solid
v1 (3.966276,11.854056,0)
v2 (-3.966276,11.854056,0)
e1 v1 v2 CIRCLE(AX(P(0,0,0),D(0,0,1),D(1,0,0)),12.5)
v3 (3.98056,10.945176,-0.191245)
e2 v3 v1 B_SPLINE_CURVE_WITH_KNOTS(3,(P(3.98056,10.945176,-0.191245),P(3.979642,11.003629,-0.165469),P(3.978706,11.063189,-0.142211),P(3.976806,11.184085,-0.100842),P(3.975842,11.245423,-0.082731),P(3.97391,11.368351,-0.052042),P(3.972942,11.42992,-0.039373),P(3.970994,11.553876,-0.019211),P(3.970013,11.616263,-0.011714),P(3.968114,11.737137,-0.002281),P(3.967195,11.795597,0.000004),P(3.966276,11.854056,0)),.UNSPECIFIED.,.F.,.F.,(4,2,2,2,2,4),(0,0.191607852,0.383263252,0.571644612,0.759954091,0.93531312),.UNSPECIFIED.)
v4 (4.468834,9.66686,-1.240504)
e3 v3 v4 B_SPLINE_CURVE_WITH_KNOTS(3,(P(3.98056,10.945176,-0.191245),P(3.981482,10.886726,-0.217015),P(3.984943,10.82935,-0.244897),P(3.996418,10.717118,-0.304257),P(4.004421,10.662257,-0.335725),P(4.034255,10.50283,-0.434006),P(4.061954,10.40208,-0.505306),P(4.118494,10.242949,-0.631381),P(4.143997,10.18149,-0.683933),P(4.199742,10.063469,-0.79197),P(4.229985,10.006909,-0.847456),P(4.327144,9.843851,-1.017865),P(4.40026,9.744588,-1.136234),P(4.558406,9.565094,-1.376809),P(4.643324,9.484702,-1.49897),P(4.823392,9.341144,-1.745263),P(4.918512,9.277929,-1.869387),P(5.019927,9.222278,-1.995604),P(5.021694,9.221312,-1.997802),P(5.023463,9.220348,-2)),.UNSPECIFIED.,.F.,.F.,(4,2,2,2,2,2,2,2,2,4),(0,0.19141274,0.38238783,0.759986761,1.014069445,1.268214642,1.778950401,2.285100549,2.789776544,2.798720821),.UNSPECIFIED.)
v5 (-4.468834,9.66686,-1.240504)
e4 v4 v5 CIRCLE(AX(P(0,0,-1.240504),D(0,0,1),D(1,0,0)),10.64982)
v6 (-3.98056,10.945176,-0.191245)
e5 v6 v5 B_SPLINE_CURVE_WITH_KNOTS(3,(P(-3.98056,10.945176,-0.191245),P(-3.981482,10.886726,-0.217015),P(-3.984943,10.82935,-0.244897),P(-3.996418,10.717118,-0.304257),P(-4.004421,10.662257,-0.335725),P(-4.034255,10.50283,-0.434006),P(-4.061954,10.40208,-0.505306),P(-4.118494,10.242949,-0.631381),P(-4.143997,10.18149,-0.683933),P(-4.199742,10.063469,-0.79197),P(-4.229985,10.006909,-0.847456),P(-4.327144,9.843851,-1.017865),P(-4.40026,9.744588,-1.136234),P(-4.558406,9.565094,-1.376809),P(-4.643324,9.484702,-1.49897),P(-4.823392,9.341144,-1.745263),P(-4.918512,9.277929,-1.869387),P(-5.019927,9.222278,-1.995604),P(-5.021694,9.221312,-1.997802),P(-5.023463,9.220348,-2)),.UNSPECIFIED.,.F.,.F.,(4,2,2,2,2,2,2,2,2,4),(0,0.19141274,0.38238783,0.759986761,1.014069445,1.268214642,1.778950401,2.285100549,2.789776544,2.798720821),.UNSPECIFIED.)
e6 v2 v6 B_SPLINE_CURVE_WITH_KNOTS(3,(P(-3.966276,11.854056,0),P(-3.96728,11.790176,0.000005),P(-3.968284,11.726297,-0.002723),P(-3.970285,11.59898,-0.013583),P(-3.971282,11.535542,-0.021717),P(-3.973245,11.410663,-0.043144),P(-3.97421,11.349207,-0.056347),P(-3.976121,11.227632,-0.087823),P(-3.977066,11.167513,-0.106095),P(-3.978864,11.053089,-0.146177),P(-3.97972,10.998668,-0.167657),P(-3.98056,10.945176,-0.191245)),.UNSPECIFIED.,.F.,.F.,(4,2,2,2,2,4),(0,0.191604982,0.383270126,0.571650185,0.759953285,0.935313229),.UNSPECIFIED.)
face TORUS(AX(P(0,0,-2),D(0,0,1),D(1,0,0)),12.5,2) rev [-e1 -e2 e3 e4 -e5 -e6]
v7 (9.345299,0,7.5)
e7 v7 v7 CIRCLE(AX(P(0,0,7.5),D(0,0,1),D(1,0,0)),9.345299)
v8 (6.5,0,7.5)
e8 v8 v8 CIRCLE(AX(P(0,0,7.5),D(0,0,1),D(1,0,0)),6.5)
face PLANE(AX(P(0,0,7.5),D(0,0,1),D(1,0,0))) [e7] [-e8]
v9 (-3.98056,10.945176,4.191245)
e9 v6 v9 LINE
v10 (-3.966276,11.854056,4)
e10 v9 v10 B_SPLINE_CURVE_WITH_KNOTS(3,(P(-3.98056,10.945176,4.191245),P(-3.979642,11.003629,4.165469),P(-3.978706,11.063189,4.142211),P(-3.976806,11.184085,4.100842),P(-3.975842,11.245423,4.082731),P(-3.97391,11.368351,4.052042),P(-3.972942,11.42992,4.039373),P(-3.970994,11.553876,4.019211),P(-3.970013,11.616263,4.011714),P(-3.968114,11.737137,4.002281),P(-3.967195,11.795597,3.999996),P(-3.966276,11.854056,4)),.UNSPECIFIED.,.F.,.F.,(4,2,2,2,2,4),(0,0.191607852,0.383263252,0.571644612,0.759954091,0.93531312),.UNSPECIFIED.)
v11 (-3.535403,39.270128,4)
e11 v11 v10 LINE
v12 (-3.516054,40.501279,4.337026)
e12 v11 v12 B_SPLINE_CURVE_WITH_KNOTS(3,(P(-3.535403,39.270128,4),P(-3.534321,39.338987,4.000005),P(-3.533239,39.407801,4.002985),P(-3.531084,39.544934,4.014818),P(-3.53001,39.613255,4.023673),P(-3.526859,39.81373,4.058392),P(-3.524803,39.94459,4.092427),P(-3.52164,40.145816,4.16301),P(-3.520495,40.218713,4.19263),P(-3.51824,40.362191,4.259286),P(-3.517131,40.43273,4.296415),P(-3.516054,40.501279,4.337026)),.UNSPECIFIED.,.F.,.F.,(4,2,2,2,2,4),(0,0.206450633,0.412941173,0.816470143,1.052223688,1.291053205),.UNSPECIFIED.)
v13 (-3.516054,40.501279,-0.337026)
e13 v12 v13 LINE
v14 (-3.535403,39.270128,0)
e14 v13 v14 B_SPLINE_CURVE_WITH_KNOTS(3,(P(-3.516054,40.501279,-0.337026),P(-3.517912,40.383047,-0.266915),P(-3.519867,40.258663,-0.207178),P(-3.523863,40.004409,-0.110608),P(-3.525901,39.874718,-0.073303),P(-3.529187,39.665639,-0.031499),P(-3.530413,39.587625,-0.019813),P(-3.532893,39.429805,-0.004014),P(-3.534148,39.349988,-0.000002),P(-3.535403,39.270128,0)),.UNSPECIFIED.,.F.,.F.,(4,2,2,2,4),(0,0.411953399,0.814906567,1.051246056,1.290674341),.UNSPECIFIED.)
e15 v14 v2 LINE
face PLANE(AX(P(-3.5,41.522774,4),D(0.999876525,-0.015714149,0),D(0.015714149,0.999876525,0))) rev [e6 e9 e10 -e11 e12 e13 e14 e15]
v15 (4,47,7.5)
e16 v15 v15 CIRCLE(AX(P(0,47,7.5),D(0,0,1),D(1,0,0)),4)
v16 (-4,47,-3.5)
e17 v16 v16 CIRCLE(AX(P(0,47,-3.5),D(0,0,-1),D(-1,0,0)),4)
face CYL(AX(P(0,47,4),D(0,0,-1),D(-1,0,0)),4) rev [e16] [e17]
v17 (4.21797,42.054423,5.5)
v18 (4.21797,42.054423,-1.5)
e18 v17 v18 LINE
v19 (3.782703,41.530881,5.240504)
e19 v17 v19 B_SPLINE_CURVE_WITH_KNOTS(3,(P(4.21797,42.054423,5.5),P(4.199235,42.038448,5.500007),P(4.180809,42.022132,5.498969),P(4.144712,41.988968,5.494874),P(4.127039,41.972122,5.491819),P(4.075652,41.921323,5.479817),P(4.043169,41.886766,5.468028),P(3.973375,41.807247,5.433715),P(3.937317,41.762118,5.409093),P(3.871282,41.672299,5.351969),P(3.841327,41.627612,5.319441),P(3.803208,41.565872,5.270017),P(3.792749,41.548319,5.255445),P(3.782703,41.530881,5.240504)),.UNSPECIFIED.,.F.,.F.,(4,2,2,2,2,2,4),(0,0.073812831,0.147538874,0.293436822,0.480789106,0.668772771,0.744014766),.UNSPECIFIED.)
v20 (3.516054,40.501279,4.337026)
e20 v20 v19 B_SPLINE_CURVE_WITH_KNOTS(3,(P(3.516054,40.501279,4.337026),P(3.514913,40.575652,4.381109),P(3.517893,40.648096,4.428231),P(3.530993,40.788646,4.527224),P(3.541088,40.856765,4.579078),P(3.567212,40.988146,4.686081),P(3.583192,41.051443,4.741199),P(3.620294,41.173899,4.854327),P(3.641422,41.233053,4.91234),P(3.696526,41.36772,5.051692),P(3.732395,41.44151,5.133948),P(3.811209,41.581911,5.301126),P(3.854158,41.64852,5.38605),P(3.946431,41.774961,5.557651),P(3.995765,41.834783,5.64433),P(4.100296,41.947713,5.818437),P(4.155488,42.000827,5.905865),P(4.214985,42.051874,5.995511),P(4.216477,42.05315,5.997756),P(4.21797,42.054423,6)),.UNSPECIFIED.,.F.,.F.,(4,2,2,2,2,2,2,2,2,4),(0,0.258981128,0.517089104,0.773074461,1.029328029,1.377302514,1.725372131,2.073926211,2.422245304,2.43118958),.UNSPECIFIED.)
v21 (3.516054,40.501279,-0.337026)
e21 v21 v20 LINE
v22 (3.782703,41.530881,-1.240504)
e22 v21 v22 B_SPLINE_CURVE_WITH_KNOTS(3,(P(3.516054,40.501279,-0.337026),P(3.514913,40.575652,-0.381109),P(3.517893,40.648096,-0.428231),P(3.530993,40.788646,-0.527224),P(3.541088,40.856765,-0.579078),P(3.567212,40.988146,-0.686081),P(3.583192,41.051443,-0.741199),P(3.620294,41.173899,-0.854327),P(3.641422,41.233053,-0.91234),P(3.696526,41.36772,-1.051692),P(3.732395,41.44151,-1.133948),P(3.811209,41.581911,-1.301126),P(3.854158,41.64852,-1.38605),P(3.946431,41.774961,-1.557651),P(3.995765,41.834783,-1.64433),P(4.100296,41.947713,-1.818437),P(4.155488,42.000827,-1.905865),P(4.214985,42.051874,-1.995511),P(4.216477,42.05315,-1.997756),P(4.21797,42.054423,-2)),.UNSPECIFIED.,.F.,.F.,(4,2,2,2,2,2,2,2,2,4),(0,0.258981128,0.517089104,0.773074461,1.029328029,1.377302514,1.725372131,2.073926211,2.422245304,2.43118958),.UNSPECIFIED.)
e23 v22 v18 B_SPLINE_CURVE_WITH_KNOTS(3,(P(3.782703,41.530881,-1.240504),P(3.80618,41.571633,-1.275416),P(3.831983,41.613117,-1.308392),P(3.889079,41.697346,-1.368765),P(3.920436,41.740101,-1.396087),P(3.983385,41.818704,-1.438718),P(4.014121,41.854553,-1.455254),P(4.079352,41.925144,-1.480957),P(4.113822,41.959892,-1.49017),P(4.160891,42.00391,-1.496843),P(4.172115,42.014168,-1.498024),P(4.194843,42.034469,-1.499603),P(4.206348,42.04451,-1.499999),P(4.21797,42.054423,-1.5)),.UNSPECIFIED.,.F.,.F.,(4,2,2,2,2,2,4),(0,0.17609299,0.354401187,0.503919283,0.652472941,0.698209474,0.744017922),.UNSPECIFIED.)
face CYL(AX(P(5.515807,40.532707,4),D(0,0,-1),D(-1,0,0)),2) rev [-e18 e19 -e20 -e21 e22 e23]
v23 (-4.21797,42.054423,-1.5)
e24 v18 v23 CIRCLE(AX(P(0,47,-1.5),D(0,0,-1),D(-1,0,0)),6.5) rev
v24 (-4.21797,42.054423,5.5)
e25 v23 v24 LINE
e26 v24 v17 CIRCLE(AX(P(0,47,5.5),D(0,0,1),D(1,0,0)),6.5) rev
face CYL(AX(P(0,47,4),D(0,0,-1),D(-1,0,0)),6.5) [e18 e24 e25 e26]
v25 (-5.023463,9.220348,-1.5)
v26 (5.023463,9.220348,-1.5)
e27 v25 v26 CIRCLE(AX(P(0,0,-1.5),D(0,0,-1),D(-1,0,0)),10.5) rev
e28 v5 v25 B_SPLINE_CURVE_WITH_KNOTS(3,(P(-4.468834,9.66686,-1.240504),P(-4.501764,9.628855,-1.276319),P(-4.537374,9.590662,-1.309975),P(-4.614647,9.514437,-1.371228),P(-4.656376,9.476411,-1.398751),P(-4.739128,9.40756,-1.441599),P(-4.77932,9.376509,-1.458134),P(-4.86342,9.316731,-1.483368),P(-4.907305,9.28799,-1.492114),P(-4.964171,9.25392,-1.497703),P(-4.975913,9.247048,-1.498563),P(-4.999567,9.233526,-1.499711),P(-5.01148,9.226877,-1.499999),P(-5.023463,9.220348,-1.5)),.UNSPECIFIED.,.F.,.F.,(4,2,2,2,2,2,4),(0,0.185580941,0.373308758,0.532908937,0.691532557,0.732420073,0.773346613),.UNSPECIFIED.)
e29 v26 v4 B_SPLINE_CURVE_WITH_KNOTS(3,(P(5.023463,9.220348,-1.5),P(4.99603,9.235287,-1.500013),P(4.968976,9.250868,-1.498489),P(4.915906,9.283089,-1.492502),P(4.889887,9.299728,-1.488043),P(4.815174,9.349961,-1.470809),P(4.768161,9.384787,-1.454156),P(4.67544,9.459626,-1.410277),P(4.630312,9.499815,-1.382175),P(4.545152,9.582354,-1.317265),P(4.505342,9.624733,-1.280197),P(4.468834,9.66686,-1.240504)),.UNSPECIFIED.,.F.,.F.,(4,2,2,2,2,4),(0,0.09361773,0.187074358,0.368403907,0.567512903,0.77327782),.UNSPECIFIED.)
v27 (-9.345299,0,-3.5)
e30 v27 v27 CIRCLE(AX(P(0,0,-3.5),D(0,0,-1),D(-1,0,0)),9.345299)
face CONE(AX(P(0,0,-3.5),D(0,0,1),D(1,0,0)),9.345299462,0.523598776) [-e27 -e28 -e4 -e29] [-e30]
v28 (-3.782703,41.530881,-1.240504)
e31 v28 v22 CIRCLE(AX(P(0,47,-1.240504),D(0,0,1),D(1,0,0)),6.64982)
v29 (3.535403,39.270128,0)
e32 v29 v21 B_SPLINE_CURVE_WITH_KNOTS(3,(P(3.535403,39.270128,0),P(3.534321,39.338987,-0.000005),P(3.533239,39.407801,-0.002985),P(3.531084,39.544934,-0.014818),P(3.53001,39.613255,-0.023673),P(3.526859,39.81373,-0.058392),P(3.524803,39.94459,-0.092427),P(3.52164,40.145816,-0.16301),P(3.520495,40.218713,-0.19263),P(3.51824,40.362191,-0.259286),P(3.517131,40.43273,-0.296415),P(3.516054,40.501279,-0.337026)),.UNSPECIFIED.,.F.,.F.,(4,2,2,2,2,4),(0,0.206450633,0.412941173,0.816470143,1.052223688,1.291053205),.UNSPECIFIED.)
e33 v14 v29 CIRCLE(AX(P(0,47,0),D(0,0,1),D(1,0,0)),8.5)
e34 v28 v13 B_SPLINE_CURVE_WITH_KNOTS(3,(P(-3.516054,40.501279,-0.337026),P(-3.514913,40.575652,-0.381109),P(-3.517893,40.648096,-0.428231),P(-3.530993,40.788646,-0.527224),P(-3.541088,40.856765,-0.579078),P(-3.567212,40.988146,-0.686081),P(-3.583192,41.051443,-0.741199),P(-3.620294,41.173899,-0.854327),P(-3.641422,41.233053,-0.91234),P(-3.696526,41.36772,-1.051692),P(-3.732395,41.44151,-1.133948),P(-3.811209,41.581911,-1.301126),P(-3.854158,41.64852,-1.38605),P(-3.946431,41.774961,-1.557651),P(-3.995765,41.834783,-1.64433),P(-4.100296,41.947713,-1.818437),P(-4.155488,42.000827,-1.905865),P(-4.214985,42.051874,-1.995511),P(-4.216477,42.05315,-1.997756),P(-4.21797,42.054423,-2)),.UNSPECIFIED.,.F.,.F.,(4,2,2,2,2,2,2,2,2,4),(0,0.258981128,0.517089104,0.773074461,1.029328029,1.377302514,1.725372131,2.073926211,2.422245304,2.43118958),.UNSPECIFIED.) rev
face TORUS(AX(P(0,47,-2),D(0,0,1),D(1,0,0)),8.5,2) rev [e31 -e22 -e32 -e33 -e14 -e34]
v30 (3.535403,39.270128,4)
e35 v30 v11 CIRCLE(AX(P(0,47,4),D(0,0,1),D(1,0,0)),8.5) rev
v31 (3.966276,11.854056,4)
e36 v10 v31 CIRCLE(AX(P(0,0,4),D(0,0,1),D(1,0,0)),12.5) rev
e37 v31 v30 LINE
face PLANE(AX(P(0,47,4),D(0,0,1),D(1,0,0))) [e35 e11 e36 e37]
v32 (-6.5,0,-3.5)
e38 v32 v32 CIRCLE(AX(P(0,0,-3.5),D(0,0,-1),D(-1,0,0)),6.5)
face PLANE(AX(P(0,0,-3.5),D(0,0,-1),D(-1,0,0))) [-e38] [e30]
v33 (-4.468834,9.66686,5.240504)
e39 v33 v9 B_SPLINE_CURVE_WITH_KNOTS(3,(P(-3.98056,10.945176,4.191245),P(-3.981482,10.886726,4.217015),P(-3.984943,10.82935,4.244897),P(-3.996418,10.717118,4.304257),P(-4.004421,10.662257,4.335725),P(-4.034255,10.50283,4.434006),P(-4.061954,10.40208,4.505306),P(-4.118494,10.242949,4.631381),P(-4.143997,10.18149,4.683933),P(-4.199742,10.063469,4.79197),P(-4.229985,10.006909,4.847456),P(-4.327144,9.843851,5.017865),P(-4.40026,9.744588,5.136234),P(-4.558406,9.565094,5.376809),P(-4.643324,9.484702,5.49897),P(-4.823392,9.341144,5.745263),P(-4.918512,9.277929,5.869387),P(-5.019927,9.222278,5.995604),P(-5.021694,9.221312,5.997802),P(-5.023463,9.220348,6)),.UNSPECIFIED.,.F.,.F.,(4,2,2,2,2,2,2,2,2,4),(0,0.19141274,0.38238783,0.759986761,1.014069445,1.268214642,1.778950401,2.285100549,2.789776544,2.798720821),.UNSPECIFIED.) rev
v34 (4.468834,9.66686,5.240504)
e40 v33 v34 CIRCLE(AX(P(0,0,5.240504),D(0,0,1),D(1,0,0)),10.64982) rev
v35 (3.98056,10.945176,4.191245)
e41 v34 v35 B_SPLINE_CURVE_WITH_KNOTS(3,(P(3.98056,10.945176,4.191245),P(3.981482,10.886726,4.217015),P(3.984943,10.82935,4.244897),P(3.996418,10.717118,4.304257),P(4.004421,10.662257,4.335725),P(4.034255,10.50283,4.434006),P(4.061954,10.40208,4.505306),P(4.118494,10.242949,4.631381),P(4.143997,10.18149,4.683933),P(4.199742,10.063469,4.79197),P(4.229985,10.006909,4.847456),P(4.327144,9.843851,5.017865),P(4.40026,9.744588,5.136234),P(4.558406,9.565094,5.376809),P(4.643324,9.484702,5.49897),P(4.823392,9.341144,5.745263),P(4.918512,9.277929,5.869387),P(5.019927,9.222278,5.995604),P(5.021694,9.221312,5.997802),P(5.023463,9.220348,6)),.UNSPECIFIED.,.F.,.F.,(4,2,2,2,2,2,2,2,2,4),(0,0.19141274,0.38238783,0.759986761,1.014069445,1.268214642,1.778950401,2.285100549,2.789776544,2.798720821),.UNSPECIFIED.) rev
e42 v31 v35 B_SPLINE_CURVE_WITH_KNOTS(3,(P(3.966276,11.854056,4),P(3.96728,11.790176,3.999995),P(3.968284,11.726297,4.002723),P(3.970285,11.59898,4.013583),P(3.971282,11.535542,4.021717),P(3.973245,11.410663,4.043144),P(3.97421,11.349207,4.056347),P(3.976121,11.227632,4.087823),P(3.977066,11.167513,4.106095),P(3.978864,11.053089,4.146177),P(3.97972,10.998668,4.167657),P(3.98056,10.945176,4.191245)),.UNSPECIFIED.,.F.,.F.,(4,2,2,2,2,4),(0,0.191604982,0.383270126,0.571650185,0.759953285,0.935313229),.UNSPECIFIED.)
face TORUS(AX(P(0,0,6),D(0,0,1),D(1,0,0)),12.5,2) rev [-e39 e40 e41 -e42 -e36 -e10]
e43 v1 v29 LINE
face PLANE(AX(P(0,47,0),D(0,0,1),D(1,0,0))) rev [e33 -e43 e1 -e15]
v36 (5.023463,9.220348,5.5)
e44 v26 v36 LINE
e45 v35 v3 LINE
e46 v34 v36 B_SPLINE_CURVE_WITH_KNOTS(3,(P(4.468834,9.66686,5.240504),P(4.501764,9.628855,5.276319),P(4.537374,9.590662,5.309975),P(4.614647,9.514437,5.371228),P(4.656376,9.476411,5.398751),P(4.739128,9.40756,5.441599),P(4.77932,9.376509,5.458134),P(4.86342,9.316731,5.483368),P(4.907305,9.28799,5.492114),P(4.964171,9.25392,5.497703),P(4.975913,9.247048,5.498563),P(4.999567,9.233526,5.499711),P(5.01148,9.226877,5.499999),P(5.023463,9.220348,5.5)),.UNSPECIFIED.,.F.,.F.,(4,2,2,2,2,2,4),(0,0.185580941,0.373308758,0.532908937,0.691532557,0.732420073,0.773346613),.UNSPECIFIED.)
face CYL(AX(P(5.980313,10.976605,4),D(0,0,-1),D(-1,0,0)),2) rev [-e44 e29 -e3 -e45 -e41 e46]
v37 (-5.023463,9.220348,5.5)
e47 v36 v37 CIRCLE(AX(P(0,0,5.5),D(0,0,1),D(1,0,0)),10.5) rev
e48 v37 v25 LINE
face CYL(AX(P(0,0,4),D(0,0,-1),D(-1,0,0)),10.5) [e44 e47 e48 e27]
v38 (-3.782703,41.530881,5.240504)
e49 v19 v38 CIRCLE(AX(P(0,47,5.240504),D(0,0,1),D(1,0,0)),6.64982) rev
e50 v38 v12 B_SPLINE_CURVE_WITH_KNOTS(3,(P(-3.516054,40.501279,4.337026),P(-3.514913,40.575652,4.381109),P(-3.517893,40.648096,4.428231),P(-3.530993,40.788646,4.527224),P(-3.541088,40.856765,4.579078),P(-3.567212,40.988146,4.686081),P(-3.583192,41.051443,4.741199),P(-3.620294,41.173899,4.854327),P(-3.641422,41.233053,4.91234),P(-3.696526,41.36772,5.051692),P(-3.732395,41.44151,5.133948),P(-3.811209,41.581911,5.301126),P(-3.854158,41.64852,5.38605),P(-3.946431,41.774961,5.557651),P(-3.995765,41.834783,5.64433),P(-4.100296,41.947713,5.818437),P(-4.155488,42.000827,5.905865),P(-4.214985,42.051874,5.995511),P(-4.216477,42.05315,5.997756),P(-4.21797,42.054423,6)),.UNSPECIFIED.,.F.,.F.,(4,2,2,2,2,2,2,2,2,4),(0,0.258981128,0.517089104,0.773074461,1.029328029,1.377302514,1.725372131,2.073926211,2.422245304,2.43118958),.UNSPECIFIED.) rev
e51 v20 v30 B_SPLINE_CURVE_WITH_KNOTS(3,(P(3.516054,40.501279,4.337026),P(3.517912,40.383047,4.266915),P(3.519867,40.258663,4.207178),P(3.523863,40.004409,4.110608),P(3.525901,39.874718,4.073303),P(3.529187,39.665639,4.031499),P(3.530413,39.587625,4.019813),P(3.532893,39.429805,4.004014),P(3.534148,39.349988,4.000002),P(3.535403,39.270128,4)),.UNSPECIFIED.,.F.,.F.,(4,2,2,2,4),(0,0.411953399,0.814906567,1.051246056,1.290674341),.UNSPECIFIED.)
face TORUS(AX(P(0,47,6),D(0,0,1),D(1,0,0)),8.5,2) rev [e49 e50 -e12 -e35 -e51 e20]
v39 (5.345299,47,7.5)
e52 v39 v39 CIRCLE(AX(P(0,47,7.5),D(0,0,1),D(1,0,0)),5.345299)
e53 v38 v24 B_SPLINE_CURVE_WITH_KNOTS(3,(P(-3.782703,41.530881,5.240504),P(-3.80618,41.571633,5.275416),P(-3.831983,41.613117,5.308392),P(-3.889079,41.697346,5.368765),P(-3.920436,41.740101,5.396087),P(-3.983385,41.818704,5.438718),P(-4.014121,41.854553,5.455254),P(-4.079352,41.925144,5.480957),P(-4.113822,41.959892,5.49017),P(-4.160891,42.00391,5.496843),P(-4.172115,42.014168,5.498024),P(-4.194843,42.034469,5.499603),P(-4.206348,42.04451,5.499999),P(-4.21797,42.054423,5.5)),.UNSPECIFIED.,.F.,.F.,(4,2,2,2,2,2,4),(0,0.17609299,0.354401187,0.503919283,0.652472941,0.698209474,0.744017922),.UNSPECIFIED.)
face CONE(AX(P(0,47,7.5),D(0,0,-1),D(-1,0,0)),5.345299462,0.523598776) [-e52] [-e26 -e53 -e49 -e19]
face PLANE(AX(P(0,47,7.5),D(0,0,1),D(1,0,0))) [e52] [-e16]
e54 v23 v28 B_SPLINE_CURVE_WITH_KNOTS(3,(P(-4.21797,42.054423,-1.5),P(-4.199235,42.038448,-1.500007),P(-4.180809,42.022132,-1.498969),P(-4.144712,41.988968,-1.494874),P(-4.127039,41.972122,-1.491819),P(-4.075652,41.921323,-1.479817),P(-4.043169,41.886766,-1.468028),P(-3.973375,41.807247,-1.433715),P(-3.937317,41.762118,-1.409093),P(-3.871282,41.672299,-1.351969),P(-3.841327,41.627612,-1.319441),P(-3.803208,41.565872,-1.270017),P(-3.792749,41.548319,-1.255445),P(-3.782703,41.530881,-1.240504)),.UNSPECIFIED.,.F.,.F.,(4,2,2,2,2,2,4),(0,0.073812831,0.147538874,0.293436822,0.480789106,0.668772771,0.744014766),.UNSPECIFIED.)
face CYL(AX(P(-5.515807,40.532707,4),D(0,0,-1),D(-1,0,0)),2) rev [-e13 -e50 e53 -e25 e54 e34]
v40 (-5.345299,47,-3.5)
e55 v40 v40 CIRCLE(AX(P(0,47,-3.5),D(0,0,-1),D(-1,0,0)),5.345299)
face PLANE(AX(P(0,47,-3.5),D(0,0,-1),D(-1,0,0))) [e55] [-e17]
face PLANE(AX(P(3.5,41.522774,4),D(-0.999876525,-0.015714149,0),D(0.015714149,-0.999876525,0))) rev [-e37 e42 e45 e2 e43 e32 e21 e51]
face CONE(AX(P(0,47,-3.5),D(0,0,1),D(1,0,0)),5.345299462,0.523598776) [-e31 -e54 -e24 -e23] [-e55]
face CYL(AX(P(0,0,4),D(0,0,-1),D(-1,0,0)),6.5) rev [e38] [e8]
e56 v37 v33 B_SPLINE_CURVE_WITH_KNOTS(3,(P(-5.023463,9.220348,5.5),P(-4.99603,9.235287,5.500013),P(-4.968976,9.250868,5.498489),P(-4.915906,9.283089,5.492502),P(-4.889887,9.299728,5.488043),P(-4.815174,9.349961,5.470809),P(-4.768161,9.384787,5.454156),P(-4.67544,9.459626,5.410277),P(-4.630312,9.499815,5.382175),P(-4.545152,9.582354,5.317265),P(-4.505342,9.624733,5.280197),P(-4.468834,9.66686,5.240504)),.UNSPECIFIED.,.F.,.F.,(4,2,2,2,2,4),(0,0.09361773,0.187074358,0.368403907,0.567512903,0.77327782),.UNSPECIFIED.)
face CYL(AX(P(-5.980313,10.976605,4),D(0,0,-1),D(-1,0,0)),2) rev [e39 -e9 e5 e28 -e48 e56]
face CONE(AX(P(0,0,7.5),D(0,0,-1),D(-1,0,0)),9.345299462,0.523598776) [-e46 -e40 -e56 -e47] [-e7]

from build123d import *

# Parameters (mm, degrees)
ESQUISSE1_R          = 6.5
ESQUISSE1_R_2        = 4
BASE_EXTRUSION_DEPTH = 4
ESQUISSE2_R          = 6.5
ESQUISSE2_R_2        = 4
ESQUISSE2_R_3        = 10.5
BOSS_EXTRU_1_DEPTH   = 3.5
BOSS_EXTRU_2_START   = 3.5
ESQUISSE3_R          = 6.5
ESQUISSE3_R_2        = 4
ESQUISSE3_R_3        = 10.5
BOSS_EXTRU_2_DEPTH   = 3.5
CONG_1_R             = 2


with BuildPart() as part:
    # Esquisse1 → Base-Extrusion (new body)
    with BuildSketch(Plane.XY):
        with BuildLine():
            Line((-3.5, 41.522774425), (-4, 9.708243919))
            ThreePointArc((-4, 9.708243919), (0, -10.5), (4, 9.708243919))
            Line((4, 9.708243919), (3.5, 41.522774425))
            ThreePointArc((3.5, 41.522774425), (0, 53.5), (-3.5, 41.522774425))
        make_face()
        Circle(ESQUISSE1_R, mode=Mode.SUBTRACT)
        with Locations((0, 47)):
            Circle(ESQUISSE1_R_2, mode=Mode.SUBTRACT)
    extrude(amount=BASE_EXTRUSION_DEPTH)

    # Esquisse2 → Boss.-Extru.1 (add)
    # profile 1 of 2: a face of its own
    with BuildSketch(Plane.XY.offset(4)):
        with Locations(Location((0, 47, 0), (0, 0, 237.421029607))):
            Circle(ESQUISSE2_R)
        with Locations((0, 47)):
            Circle(ESQUISSE2_R_2, mode=Mode.SUBTRACT)
    # profile 2 of 2: a face of its own
    with BuildSketch(Plane.XY.offset(4)):
        with Locations(Location((0, 0, 0), (0, 0, 112.392687805))):
            Circle(ESQUISSE2_R_3)
        Circle(ESQUISSE2_R, mode=Mode.SUBTRACT)
    extrude(amount=BOSS_EXTRU_1_DEPTH)

    # Esquisse3 → Boss.-Extru.2 (add)
    # profile 1 of 2: a face of its own
    with BuildSketch(Plane(origin=(0, 0, 0), x_dir=(-1, 0, 0), z_dir=(0, 0, -1)).offset(BOSS_EXTRU_2_START)):
        with Locations((0, 47)):
            Circle(ESQUISSE3_R)
        with Locations((0, 47)):
            Circle(ESQUISSE3_R_2, mode=Mode.SUBTRACT)
    # profile 2 of 2: a face of its own
    with BuildSketch(Plane(origin=(0, 0, 0), x_dir=(-1, 0, 0), z_dir=(0, 0, -1)).offset(BOSS_EXTRU_2_START)):
        Circle(ESQUISSE3_R_3)
        Circle(ESQUISSE3_R, mode=Mode.SUBTRACT)
    extrude(amount=-BOSS_EXTRU_2_DEPTH)

    # Congé1
    # the kernel refuses this fillet: 2 mm, written as the material it adds along each edge
    with BuildSketch(Plane(origin=(0, 47, 4), x_dir=(-0.9730257841086011, -0.23069638805113993, 0), z_dir=(-0.23069638805113993, 0.9730257841086011, 0))) as cong_1_piece_1_section:
        with BuildLine():
            CenterArc((6.5 + CONG_1_R, CONG_1_R), CONG_1_R, 180, 90)
            Line((6.5 + CONG_1_R, 0), (6.5, 0))
            Line((6.5, 0), (6.5, CONG_1_R))
        make_face()
    cong_1_piece_1 = revolve(axis=Axis((0, 47, 4), (0, 0, 1)), revolution_arc=153.323851042, mode=Mode.PRIVATE)
    cong_1_piece_1 = split(cong_1_piece_1, bisect_by=Plane(origin=(3.517247673, 40.425321182, 4.453760359), z_dir=(-0.9998765251425995, -0.015714148680750627, 0)), keep=Keep.TOP, mode=Mode.PRIVATE)
    cong_1_piece_1 = split(cong_1_piece_1, bisect_by=Plane(origin=(-3.517247673, 40.425321169, 4.453760359), z_dir=(0.9998765251425995, -0.0157141486807504, 0)), keep=Keep.TOP, mode=Mode.PRIVATE)
    add(cong_1_piece_1)
    with BuildSketch(Plane(origin=(0, 0, 4), x_dir=(0.7624324114570696, 0.6470678619432104, 0), z_dir=(0.6470678619432104, -0.7624324114570696, 0))) as cong_1_piece_2_section:
        with BuildLine():
            CenterArc((10.5 + CONG_1_R, CONG_1_R), CONG_1_R, 180, 90)
            Line((10.5, CONG_1_R), (10.5, 0))
            Line((10.5, 0), (10.5 + CONG_1_R, 0))
        make_face()
    cong_1_piece_2 = revolve(axis=Axis((0, 0, 4), (0, 0, 1)), revolution_arc=99.358211417, mode=Mode.PRIVATE)
    cong_1_piece_2 = split(cong_1_piece_2, bisect_by=Plane(origin=(3.983456329, 10.760902188, 4.453755319), z_dir=(-0.9998765251425995, -0.015714148680750627, 0)), keep=Keep.TOP, mode=Mode.PRIVATE)
    cong_1_piece_2 = split(cong_1_piece_2, bisect_by=Plane(origin=(-3.983456328, 10.760902231, 4.453755319), z_dir=(0.9998765251425995, -0.0157141486807504, 0)), keep=Keep.TOP, mode=Mode.PRIVATE)
    add(cong_1_piece_2)
    with BuildSketch(Plane(origin=(0, 47, 0), x_dir=(0.9730257841078124, -0.23069638805446635, 0), z_dir=(0.23069638805446635, 0.9730257841078124, 0))) as cong_1_piece_3_section:
        with BuildLine():
            CenterArc((6.5 + CONG_1_R, CONG_1_R), CONG_1_R, 180, 90)
            Line((6.5, CONG_1_R), (6.5, 0))
            Line((6.5, 0), (6.5 + CONG_1_R, 0))
        make_face()
    cong_1_piece_3 = revolve(axis=Axis((0, 47, 0), (0, 0, -1)), revolution_arc=153.323851042, mode=Mode.PRIVATE)
    cong_1_piece_3 = split(cong_1_piece_3, bisect_by=Plane(origin=(3.517247674, 40.425321152, -0.453760356), z_dir=(-0.9998765251425995, -0.015714148680750627, 0)), keep=Keep.TOP, mode=Mode.PRIVATE)
    cong_1_piece_3 = split(cong_1_piece_3, bisect_by=Plane(origin=(-3.517247674, 40.425321145, -0.453760356), z_dir=(0.9998765251425995, -0.0157141486807504, 0)), keep=Keep.TOP, mode=Mode.PRIVATE)
    add(cong_1_piece_3)
    with BuildSketch(Plane(origin=(0, 0, 0), x_dir=(-0.7624324114570697, 0.6470678619432102, 0), z_dir=(-0.6470678619432102, -0.7624324114570697, 0))) as cong_1_piece_4_section:
        with BuildLine():
            CenterArc((10.5 + CONG_1_R, CONG_1_R), CONG_1_R, 180, 90)
            Line((10.5, CONG_1_R), (10.5, 0))
            Line((10.5, 0), (10.5 + CONG_1_R, 0))
        make_face()
    cong_1_piece_4 = revolve(axis=Axis((0, 0, 0), (0, 0, -1)), revolution_arc=99.358211417, mode=Mode.PRIVATE)
    cong_1_piece_4 = split(cong_1_piece_4, bisect_by=Plane(origin=(3.983456329, 10.760902188, -0.453755319), z_dir=(-0.9998765251425995, -0.015714148680750627, 0)), keep=Keep.TOP, mode=Mode.PRIVATE)
    cong_1_piece_4 = split(cong_1_piece_4, bisect_by=Plane(origin=(-3.983456328, 10.760902231, -0.453755319), z_dir=(0.9998765251425995, -0.0157141486807504, 0)), keep=Keep.TOP, mode=Mode.PRIVATE)
    add(cong_1_piece_4)
    with BuildSketch(Plane(origin=(3.5, 41.522774425, 0), x_dir=(0.015714148680751626, -0.9998765251425993, 0), z_dir=(0, 0, 1))) as cong_1_piece_5:
        with BuildLine():
            CenterArc((1.021621466, 2), CONG_1_R, 219.559716944, 50.440283056)
            ThreePointArc((-0.520300949, 0.726235788), (-0.247658669, 0.372067464), (0, 0))
            Line((0, 0), (1.021621466, 0))
        make_face()
    extrude(amount=4)
    with BuildSketch(Plane(origin=(4, 9.708243919, 0), x_dir=(-0.01571414868075148, 0.9998765251425994, 0), z_dir=(0, 0, 1))) as cong_1_piece_6:
        with BuildLine():
            CenterArc((1.237085323, -2), CONG_1_R, 90, 60.517017612)
            ThreePointArc((-0.503918505, -1.015669938), (-0.238240031, -0.514641677), (0, 0))
            Line((0, 0), (1.237085323, 0))
        make_face()
    extrude(amount=4)
    with BuildSketch(Plane(origin=(-4, 9.708243919, 0), x_dir=(-0.902678139107061, -0.4303163687082024, 0), z_dir=(0, 0, 1))) as cong_1_piece_7:
        with BuildLine():
            CenterArc((1.241789087, -1.997082863), CONG_1_R, 93.094951563, 60.517017612)
            Line((-0.549820165, -1.108186755), (0, 0))
            ThreePointArc((0, 0), (0.566903714, -0.01531497), (1.133807427, 0))
        make_face()
    extrude(amount=4)
    with BuildSketch(Plane(origin=(-3.5, 41.522774425, 0), x_dir=(-0.8036539633603179, 0.5950968888973062, 0), z_dir=(0, 0, 1))) as cong_1_piece_8:
        with BuildLine():
            CenterArc((1.030825449, 1.995271739), CONG_1_R, 215.61914794, 50.440283056)
            Line((-0.594986898, 0.830482396), (0, 0))
            ThreePointArc((0, 0), (0.446691028, 0.015366847), (0.893382055, 0))
        make_face()
    extrude(amount=4)
    with BuildSketch(Plane(origin=(-3.5, 41.522774425, 0), x_dir=(-0.8036539633603179, 0.5950968888973062, 0), z_dir=(0, 0, 1))) as cong_1_piece_9a_section:
        with BuildLine():
            CenterArc((1.030825449, 1.995271739), CONG_1_R, 215.61914794, 50.440283056)
            Line((-0.594986898, 0.830482396), (0, 0))
            ThreePointArc((0, 0), (0.446691028, 0.015366847), (0.893382055, 0))
        make_face()
    cong_1_piece_9a = extrude(amount=6.554053664, mode=Mode.PRIVATE)
    cong_1_piece_9a = split(cong_1_piece_9a, bisect_by=Plane(origin=(-3.656694751, 41.398372056, 4), z_dir=(0, 0, 1)), keep=Keep.TOP, mode=Mode.PRIVATE)
    with BuildSketch(Plane(origin=(0, 47, 4), x_dir=(-0.9730257841086011, -0.23069638805113993, 0), z_dir=(-0.23069638805113993, 0.9730257841086011, 0))) as cong_1_piece_9b_section:
        with BuildLine():
            CenterArc((6.5 + CONG_1_R, CONG_1_R), CONG_1_R, 180, 90)
            Line((6.5 + CONG_1_R, 0), (6.5, 0))
            Line((6.5, 0), (6.5, CONG_1_R))
        make_face()
    cong_1_piece_9b = revolve(axis=Axis((0, 47, 4), (0, 0, 1)), revolution_arc=153.323851042, mode=Mode.PRIVATE)
    cong_1_piece_9b = split(cong_1_piece_9b, bisect_by=Plane(origin=(-3.4781959, 42.910148851, 4.426023239), z_dir=(-0.9998765251425995, 0.0157141486807504, 0)), keep=Keep.TOP, mode=Mode.PRIVATE)
    cong_1_piece_9 = cong_1_piece_9a & cong_1_piece_9b
    add(cong_1_piece_9)
    with BuildSketch(Plane(origin=(3.5, 41.522774425, 0), x_dir=(0.015714148680751626, -0.9998765251425993, 0), z_dir=(0, 0, 1))) as cong_1_piece_10a_section:
        with BuildLine():
            CenterArc((1.021621466, 2), CONG_1_R, 219.559716944, 50.440283056)
            ThreePointArc((-0.520300949, 0.726235788), (-0.247658669, 0.372067464), (0, 0))
            Line((0, 0), (1.021621466, 0))
        make_face()
    cong_1_piece_10a = extrude(amount=6.554053664, mode=Mode.PRIVATE)
    cong_1_piece_10a = split(cong_1_piece_10a, bisect_by=Plane(origin=(3.656694751, 41.398372056, 4), z_dir=(0, 0, 1)), keep=Keep.TOP, mode=Mode.PRIVATE)
    with BuildSketch(Plane(origin=(0, 47, 4), x_dir=(-0.9730257841086011, -0.23069638805113993, 0), z_dir=(-0.23069638805113993, 0.9730257841086011, 0))) as cong_1_piece_10b_section:
        with BuildLine():
            CenterArc((6.5 + CONG_1_R, CONG_1_R), CONG_1_R, 180, 90)
            Line((6.5 + CONG_1_R, 0), (6.5, 0))
            Line((6.5, 0), (6.5, CONG_1_R))
        make_face()
    cong_1_piece_10b = revolve(axis=Axis((0, 47, 4), (0, 0, 1)), revolution_arc=153.323851042, mode=Mode.PRIVATE)
    cong_1_piece_10b = split(cong_1_piece_10b, bisect_by=Plane(origin=(3.478195889, 42.91014955, 4.426023438), z_dir=(0.9998765251425995, 0.015714148680750627, 0)), keep=Keep.TOP, mode=Mode.PRIVATE)
    cong_1_piece_10 = cong_1_piece_10a & cong_1_piece_10b
    add(cong_1_piece_10)
    with BuildSketch(Plane(origin=(4, 9.708243919, 0), x_dir=(-0.01571414868075148, 0.9998765251425994, 0), z_dir=(0, 0, 1))) as cong_1_piece_11a_section:
        with BuildLine():
            CenterArc((1.237085323, -2), CONG_1_R, 90, 60.517017612)
            ThreePointArc((-0.503918505, -1.015669938), (-0.238240031, -0.514641677), (0, 0))
            Line((0, 0), (1.237085323, 0))
        make_face()
    cong_1_piece_11a = extrude(amount=7.092713308, mode=Mode.PRIVATE)
    cong_1_piece_11a = split(cong_1_piece_11a, bisect_by=Plane(origin=(4.217733498, 9.886431085, 4), z_dir=(0, 0, 1)), keep=Keep.TOP, mode=Mode.PRIVATE)
    with BuildSketch(Plane(origin=(0, 0, 4), x_dir=(0.7624324114570696, 0.6470678619432104, 0), z_dir=(0.6470678619432104, -0.7624324114570696, 0))) as cong_1_piece_11b_section:
        with BuildLine():
            CenterArc((10.5 + CONG_1_R, CONG_1_R), CONG_1_R, 180, 90)
            Line((10.5, CONG_1_R), (10.5, 0))
            Line((10.5, 0), (10.5 + CONG_1_R, 0))
        make_face()
    cong_1_piece_11b = revolve(axis=Axis((0, 0, 4), (0, 0, 1)), revolution_arc=99.358211417, mode=Mode.PRIVATE)
    cong_1_piece_11b = split(cong_1_piece_11b, bisect_by=Plane(origin=(4.014039925, 8.814896672, 4.434458184), z_dir=(0.9998765251425995, 0.015714148680750627, 0)), keep=Keep.TOP, mode=Mode.PRIVATE)
    cong_1_piece_11 = cong_1_piece_11a & cong_1_piece_11b
    add(cong_1_piece_11)
    with BuildSketch(Plane(origin=(-4, 9.708243919, 0), x_dir=(-0.902678139107061, -0.4303163687082024, 0), z_dir=(0, 0, 1))) as cong_1_piece_12a_section:
        with BuildLine():
            CenterArc((1.241789087, -1.997082863), CONG_1_R, 93.094951563, 60.517017612)
            Line((-0.549820165, -1.108186755), (0, 0))
            ThreePointArc((0, 0), (0.566903714, -0.01531497), (1.133807427, 0))
        make_face()
    cong_1_piece_12a = extrude(amount=7.092713308, mode=Mode.PRIVATE)
    cong_1_piece_12a = split(cong_1_piece_12a, bisect_by=Plane(origin=(-4.217733498, 9.886431085, 4), z_dir=(0, 0, 1)), keep=Keep.TOP, mode=Mode.PRIVATE)
    with BuildSketch(Plane(origin=(0, 0, 4), x_dir=(0.7624324114570696, 0.6470678619432104, 0), z_dir=(0.6470678619432104, -0.7624324114570696, 0))) as cong_1_piece_12b_section:
        with BuildLine():
            CenterArc((10.5 + CONG_1_R, CONG_1_R), CONG_1_R, 180, 90)
            Line((10.5, CONG_1_R), (10.5, 0))
            Line((10.5, 0), (10.5 + CONG_1_R, 0))
        make_face()
    cong_1_piece_12b = revolve(axis=Axis((0, 0, 4), (0, 0, 1)), revolution_arc=99.358211417, mode=Mode.PRIVATE)
    cong_1_piece_12b = split(cong_1_piece_12b, bisect_by=Plane(origin=(-4.014039941, 8.814895643, 4.434458219), z_dir=(-0.9998765251425995, 0.0157141486807504, 0)), keep=Keep.TOP, mode=Mode.PRIVATE)
    cong_1_piece_12 = cong_1_piece_12a & cong_1_piece_12b
    add(cong_1_piece_12)
    with BuildSketch(Plane(origin=(3.5, 41.522774425, -2.554053664), x_dir=(0.01571414868075119, -0.9998765251425993, 0), z_dir=(0, 0, 1))) as cong_1_piece_13a_section:
        with BuildLine():
            CenterArc((1.021621466, 2), CONG_1_R, 219.559716944, 50.440283056)
            ThreePointArc((-0.520300949, 0.726235788), (-0.247658669, 0.372067464), (0, 0))
            Line((0, 0), (1.021621466, 0))
        make_face()
    cong_1_piece_13a = extrude(amount=6.554053664, mode=Mode.PRIVATE)
    cong_1_piece_13a = split(cong_1_piece_13a, bisect_by=Plane(origin=(3.656694751, 41.398372056, 0), z_dir=(0, 0, -1)), keep=Keep.TOP, mode=Mode.PRIVATE)
    with BuildSketch(Plane(origin=(0, 47, 0), x_dir=(0.9730257841078124, -0.23069638805446635, 0), z_dir=(0.23069638805446635, 0.9730257841078124, 0))) as cong_1_piece_13b_section:
        with BuildLine():
            CenterArc((6.5 + CONG_1_R, CONG_1_R), CONG_1_R, 180, 90)
            Line((6.5, CONG_1_R), (6.5, 0))
            Line((6.5, 0), (6.5 + CONG_1_R, 0))
        make_face()
    cong_1_piece_13b = revolve(axis=Axis((0, 47, 0), (0, 0, -1)), revolution_arc=153.323851042, mode=Mode.PRIVATE)
    cong_1_piece_13b = split(cong_1_piece_13b, bisect_by=Plane(origin=(3.478195898, 42.910148966, -0.426023306), z_dir=(0.9998765251425995, 0.015714148680750627, 0)), keep=Keep.TOP, mode=Mode.PRIVATE)
    cong_1_piece_13 = cong_1_piece_13a & cong_1_piece_13b
    add(cong_1_piece_13)
    with BuildSketch(Plane(origin=(-3.5, 41.522774425, -2.554053664), x_dir=(-0.8036539633603179, 0.5950968888973062, 0), z_dir=(0, 0, 1))) as cong_1_piece_14a_section:
        with BuildLine():
            CenterArc((1.030825449, 1.995271739), CONG_1_R, 215.61914794, 50.440283056)
            Line((-0.594986898, 0.830482396), (0, 0))
            ThreePointArc((0, 0), (0.446691028, 0.015366847), (0.893382055, 0))
        make_face()
    cong_1_piece_14a = extrude(amount=6.554053664, mode=Mode.PRIVATE)
    cong_1_piece_14a = split(cong_1_piece_14a, bisect_by=Plane(origin=(-3.656694751, 41.398372056, 0), z_dir=(0, 0, -1)), keep=Keep.TOP, mode=Mode.PRIVATE)
    with BuildSketch(Plane(origin=(0, 47, 0), x_dir=(0.9730257841078124, -0.23069638805446635, 0), z_dir=(0.23069638805446635, 0.9730257841078124, 0))) as cong_1_piece_14b_section:
        with BuildLine():
            CenterArc((6.5 + CONG_1_R, CONG_1_R), CONG_1_R, 180, 90)
            Line((6.5, CONG_1_R), (6.5, 0))
            Line((6.5, 0), (6.5 + CONG_1_R, 0))
        make_face()
    cong_1_piece_14b = revolve(axis=Axis((0, 47, 0), (0, 0, -1)), revolution_arc=153.323851042, mode=Mode.PRIVATE)
    cong_1_piece_14b = split(cong_1_piece_14b, bisect_by=Plane(origin=(-3.478195892, 42.910149335, -0.42602338), z_dir=(-0.9998765251425995, 0.0157141486807504, 0)), keep=Keep.TOP, mode=Mode.PRIVATE)
    cong_1_piece_14 = cong_1_piece_14a & cong_1_piece_14b
    add(cong_1_piece_14)
    with BuildSketch(Plane(origin=(-4, 9.708243919, -3.092713308), x_dir=(-0.9026781391070603, -0.43031636870820344, 0), z_dir=(0, 0, 1))) as cong_1_piece_15a_section:
        with BuildLine():
            CenterArc((1.241789087, -1.997082863), CONG_1_R, 93.094951563, 60.517017612)
            Line((-0.549820165, -1.108186755), (0, 0))
            ThreePointArc((0, 0), (0.566903714, -0.01531497), (1.133807427, 0))
        make_face()
    cong_1_piece_15a = extrude(amount=7.092713308, mode=Mode.PRIVATE)
    cong_1_piece_15a = split(cong_1_piece_15a, bisect_by=Plane(origin=(-4.217733498, 9.886431085, 0), z_dir=(0, 0, -1)), keep=Keep.TOP, mode=Mode.PRIVATE)
    with BuildSketch(Plane(origin=(0, 0, 0), x_dir=(-0.7624324114570697, 0.6470678619432102, 0), z_dir=(-0.6470678619432102, -0.7624324114570697, 0))) as cong_1_piece_15b_section:
        with BuildLine():
            CenterArc((10.5 + CONG_1_R, CONG_1_R), CONG_1_R, 180, 90)
            Line((10.5, CONG_1_R), (10.5, 0))
            Line((10.5, 0), (10.5 + CONG_1_R, 0))
        make_face()
    cong_1_piece_15b = revolve(axis=Axis((0, 0, 0), (0, 0, -1)), revolution_arc=99.358211417, mode=Mode.PRIVATE)
    cong_1_piece_15b = split(cong_1_piece_15b, bisect_by=Plane(origin=(-4.014039934, 8.814896084, -0.434458135), z_dir=(-0.9998765251425995, 0.0157141486807504, 0)), keep=Keep.TOP, mode=Mode.PRIVATE)
    cong_1_piece_15 = cong_1_piece_15a & cong_1_piece_15b
    add(cong_1_piece_15)
    with BuildSketch(Plane(origin=(4, 9.708243919, -3.092713308), x_dir=(-0.015714148680750762, 0.9998765251425994, 0), z_dir=(0, 0, 1))) as cong_1_piece_16a_section:
        with BuildLine():
            CenterArc((1.237085323, -2), CONG_1_R, 90, 60.517017612)
            ThreePointArc((-0.503918505, -1.015669938), (-0.238240031, -0.514641677), (0, 0))
            Line((0, 0), (1.237085323, 0))
        make_face()
    cong_1_piece_16a = extrude(amount=7.092713308, mode=Mode.PRIVATE)
    cong_1_piece_16a = split(cong_1_piece_16a, bisect_by=Plane(origin=(4.217733498, 9.886431085, 0), z_dir=(0, 0, -1)), keep=Keep.TOP, mode=Mode.PRIVATE)
    with BuildSketch(Plane(origin=(0, 0, 0), x_dir=(-0.7624324114570697, 0.6470678619432102, 0), z_dir=(-0.6470678619432102, -0.7624324114570697, 0))) as cong_1_piece_16b_section:
        with BuildLine():
            CenterArc((10.5 + CONG_1_R, CONG_1_R), CONG_1_R, 180, 90)
            Line((10.5, CONG_1_R), (10.5, 0))
            Line((10.5, 0), (10.5 + CONG_1_R, 0))
        make_face()
    cong_1_piece_16b = revolve(axis=Axis((0, 0, 0), (0, 0, -1)), revolution_arc=99.358211417, mode=Mode.PRIVATE)
    cong_1_piece_16b = split(cong_1_piece_16b, bisect_by=Plane(origin=(4.014039932, 8.814896231, -0.434458268), z_dir=(0.9998765251425995, 0.015714148680750627, 0)), keep=Keep.TOP, mode=Mode.PRIVATE)
    cong_1_piece_16 = cong_1_piece_16a & cong_1_piece_16b
    add(cong_1_piece_16)

    # Chanfrein1
    # the kernel refuses this chamfer: 2, 1.154700538 mm, written as the material it takes off along each edge
    with BuildSketch(Plane(origin=(0, 47, 7.5), x_dir=(-0.5384615384644191, -0.8426500884676456, 0), z_dir=(-0.8426500884676456, 0.5384615384644191, 0))) as chanfrein1_piece_1:
        with BuildLine():
            Line((6.8, -2.519615242), (5.045299462, 0.519615242))
            Line((5.045299462, 0.519615242), (5.045299462, 0.819615242))
            ThreePointArc((5.045299462, 0.819615242), (5.772649731, 0.3), (6.5, 0.3))
            Line((6.5, 0.3), (6.8, 0))
            ThreePointArc((6.8, 0), (6.8, -1.259807621), (7.1, -2.519615242))
            Line((7.1, -2.519615242), (6.8, -2.519615242))
        make_face()
    revolve(axis=Axis((0, 47, 7.5), (0, 0, 1)), mode=Mode.SUBTRACT)
    with BuildSketch(Plane(origin=(0, 0, 7.5), x_dir=(-0.3809523809458997, 0.924594659000175, 0), z_dir=(0.924594659000175, 0.3809523809458997, 0))) as chanfrein1_piece_2:
        with BuildLine():
            Line((9.045299462, 0.519615242), (10.8, -2.519615242))
            Line((10.8, -2.519615242), (11.1, -2.519615242))
            ThreePointArc((11.1, -2.519615242), (10.8, -1.259807621), (10.8, 0))
            Line((10.8, 0), (10.5, 0.3))
            ThreePointArc((10.5, 0.3), (9.772649731, 0.3), (9.045299462, 0.819615242))
            Line((9.045299462, 0.819615242), (9.045299462, 0.519615242))
        make_face()
    revolve(axis=Axis((0, 0, 7.5), (0, 0, 1)), mode=Mode.SUBTRACT)
    with BuildSketch(Plane(origin=(0, 47, -3.5), x_dir=(-1, 0, 0), z_dir=(0, -1, 0))) as chanfrein1_piece_3:
        with BuildLine():
            Line((5.045299462, 0.519615242), (6.8, -2.519615242))
            Line((6.8, -2.519615242), (7.1, -2.519615242))
            ThreePointArc((7.1, -2.519615242), (6.8, -1.259807621), (6.8, 0))
            Line((6.8, 0), (6.5, 0.3))
            ThreePointArc((6.5, 0.3), (5.772649731, 0.3), (5.045299462, 0.819615242))
            Line((5.045299462, 0.819615242), (5.045299462, 0.519615242))
        make_face()
    revolve(axis=Axis((0, 47, -3.5), (0, 0, -1)), mode=Mode.SUBTRACT)
    with BuildSketch(Plane(origin=(0, 0, -3.5), x_dir=(-1, 0, 0), z_dir=(0, -1, 0))) as chanfrein1_piece_4:
        with BuildLine():
            Line((10.8, -2.519615242), (9.045299462, 0.519615242))
            Line((9.045299462, 0.519615242), (9.045299462, 0.819615242))
            ThreePointArc((9.045299462, 0.819615242), (9.772649731, 0.3), (10.5, 0.3))
            Line((10.5, 0.3), (10.8, 0))
            ThreePointArc((10.8, 0), (10.8, -1.259807621), (11.1, -2.519615242))
            Line((11.1, -2.519615242), (10.8, -2.519615242))
        make_face()
    revolve(axis=Axis((0, 0, -3.5), (0, 0, -1)), mode=Mode.SUBTRACT)


solid = part.part
